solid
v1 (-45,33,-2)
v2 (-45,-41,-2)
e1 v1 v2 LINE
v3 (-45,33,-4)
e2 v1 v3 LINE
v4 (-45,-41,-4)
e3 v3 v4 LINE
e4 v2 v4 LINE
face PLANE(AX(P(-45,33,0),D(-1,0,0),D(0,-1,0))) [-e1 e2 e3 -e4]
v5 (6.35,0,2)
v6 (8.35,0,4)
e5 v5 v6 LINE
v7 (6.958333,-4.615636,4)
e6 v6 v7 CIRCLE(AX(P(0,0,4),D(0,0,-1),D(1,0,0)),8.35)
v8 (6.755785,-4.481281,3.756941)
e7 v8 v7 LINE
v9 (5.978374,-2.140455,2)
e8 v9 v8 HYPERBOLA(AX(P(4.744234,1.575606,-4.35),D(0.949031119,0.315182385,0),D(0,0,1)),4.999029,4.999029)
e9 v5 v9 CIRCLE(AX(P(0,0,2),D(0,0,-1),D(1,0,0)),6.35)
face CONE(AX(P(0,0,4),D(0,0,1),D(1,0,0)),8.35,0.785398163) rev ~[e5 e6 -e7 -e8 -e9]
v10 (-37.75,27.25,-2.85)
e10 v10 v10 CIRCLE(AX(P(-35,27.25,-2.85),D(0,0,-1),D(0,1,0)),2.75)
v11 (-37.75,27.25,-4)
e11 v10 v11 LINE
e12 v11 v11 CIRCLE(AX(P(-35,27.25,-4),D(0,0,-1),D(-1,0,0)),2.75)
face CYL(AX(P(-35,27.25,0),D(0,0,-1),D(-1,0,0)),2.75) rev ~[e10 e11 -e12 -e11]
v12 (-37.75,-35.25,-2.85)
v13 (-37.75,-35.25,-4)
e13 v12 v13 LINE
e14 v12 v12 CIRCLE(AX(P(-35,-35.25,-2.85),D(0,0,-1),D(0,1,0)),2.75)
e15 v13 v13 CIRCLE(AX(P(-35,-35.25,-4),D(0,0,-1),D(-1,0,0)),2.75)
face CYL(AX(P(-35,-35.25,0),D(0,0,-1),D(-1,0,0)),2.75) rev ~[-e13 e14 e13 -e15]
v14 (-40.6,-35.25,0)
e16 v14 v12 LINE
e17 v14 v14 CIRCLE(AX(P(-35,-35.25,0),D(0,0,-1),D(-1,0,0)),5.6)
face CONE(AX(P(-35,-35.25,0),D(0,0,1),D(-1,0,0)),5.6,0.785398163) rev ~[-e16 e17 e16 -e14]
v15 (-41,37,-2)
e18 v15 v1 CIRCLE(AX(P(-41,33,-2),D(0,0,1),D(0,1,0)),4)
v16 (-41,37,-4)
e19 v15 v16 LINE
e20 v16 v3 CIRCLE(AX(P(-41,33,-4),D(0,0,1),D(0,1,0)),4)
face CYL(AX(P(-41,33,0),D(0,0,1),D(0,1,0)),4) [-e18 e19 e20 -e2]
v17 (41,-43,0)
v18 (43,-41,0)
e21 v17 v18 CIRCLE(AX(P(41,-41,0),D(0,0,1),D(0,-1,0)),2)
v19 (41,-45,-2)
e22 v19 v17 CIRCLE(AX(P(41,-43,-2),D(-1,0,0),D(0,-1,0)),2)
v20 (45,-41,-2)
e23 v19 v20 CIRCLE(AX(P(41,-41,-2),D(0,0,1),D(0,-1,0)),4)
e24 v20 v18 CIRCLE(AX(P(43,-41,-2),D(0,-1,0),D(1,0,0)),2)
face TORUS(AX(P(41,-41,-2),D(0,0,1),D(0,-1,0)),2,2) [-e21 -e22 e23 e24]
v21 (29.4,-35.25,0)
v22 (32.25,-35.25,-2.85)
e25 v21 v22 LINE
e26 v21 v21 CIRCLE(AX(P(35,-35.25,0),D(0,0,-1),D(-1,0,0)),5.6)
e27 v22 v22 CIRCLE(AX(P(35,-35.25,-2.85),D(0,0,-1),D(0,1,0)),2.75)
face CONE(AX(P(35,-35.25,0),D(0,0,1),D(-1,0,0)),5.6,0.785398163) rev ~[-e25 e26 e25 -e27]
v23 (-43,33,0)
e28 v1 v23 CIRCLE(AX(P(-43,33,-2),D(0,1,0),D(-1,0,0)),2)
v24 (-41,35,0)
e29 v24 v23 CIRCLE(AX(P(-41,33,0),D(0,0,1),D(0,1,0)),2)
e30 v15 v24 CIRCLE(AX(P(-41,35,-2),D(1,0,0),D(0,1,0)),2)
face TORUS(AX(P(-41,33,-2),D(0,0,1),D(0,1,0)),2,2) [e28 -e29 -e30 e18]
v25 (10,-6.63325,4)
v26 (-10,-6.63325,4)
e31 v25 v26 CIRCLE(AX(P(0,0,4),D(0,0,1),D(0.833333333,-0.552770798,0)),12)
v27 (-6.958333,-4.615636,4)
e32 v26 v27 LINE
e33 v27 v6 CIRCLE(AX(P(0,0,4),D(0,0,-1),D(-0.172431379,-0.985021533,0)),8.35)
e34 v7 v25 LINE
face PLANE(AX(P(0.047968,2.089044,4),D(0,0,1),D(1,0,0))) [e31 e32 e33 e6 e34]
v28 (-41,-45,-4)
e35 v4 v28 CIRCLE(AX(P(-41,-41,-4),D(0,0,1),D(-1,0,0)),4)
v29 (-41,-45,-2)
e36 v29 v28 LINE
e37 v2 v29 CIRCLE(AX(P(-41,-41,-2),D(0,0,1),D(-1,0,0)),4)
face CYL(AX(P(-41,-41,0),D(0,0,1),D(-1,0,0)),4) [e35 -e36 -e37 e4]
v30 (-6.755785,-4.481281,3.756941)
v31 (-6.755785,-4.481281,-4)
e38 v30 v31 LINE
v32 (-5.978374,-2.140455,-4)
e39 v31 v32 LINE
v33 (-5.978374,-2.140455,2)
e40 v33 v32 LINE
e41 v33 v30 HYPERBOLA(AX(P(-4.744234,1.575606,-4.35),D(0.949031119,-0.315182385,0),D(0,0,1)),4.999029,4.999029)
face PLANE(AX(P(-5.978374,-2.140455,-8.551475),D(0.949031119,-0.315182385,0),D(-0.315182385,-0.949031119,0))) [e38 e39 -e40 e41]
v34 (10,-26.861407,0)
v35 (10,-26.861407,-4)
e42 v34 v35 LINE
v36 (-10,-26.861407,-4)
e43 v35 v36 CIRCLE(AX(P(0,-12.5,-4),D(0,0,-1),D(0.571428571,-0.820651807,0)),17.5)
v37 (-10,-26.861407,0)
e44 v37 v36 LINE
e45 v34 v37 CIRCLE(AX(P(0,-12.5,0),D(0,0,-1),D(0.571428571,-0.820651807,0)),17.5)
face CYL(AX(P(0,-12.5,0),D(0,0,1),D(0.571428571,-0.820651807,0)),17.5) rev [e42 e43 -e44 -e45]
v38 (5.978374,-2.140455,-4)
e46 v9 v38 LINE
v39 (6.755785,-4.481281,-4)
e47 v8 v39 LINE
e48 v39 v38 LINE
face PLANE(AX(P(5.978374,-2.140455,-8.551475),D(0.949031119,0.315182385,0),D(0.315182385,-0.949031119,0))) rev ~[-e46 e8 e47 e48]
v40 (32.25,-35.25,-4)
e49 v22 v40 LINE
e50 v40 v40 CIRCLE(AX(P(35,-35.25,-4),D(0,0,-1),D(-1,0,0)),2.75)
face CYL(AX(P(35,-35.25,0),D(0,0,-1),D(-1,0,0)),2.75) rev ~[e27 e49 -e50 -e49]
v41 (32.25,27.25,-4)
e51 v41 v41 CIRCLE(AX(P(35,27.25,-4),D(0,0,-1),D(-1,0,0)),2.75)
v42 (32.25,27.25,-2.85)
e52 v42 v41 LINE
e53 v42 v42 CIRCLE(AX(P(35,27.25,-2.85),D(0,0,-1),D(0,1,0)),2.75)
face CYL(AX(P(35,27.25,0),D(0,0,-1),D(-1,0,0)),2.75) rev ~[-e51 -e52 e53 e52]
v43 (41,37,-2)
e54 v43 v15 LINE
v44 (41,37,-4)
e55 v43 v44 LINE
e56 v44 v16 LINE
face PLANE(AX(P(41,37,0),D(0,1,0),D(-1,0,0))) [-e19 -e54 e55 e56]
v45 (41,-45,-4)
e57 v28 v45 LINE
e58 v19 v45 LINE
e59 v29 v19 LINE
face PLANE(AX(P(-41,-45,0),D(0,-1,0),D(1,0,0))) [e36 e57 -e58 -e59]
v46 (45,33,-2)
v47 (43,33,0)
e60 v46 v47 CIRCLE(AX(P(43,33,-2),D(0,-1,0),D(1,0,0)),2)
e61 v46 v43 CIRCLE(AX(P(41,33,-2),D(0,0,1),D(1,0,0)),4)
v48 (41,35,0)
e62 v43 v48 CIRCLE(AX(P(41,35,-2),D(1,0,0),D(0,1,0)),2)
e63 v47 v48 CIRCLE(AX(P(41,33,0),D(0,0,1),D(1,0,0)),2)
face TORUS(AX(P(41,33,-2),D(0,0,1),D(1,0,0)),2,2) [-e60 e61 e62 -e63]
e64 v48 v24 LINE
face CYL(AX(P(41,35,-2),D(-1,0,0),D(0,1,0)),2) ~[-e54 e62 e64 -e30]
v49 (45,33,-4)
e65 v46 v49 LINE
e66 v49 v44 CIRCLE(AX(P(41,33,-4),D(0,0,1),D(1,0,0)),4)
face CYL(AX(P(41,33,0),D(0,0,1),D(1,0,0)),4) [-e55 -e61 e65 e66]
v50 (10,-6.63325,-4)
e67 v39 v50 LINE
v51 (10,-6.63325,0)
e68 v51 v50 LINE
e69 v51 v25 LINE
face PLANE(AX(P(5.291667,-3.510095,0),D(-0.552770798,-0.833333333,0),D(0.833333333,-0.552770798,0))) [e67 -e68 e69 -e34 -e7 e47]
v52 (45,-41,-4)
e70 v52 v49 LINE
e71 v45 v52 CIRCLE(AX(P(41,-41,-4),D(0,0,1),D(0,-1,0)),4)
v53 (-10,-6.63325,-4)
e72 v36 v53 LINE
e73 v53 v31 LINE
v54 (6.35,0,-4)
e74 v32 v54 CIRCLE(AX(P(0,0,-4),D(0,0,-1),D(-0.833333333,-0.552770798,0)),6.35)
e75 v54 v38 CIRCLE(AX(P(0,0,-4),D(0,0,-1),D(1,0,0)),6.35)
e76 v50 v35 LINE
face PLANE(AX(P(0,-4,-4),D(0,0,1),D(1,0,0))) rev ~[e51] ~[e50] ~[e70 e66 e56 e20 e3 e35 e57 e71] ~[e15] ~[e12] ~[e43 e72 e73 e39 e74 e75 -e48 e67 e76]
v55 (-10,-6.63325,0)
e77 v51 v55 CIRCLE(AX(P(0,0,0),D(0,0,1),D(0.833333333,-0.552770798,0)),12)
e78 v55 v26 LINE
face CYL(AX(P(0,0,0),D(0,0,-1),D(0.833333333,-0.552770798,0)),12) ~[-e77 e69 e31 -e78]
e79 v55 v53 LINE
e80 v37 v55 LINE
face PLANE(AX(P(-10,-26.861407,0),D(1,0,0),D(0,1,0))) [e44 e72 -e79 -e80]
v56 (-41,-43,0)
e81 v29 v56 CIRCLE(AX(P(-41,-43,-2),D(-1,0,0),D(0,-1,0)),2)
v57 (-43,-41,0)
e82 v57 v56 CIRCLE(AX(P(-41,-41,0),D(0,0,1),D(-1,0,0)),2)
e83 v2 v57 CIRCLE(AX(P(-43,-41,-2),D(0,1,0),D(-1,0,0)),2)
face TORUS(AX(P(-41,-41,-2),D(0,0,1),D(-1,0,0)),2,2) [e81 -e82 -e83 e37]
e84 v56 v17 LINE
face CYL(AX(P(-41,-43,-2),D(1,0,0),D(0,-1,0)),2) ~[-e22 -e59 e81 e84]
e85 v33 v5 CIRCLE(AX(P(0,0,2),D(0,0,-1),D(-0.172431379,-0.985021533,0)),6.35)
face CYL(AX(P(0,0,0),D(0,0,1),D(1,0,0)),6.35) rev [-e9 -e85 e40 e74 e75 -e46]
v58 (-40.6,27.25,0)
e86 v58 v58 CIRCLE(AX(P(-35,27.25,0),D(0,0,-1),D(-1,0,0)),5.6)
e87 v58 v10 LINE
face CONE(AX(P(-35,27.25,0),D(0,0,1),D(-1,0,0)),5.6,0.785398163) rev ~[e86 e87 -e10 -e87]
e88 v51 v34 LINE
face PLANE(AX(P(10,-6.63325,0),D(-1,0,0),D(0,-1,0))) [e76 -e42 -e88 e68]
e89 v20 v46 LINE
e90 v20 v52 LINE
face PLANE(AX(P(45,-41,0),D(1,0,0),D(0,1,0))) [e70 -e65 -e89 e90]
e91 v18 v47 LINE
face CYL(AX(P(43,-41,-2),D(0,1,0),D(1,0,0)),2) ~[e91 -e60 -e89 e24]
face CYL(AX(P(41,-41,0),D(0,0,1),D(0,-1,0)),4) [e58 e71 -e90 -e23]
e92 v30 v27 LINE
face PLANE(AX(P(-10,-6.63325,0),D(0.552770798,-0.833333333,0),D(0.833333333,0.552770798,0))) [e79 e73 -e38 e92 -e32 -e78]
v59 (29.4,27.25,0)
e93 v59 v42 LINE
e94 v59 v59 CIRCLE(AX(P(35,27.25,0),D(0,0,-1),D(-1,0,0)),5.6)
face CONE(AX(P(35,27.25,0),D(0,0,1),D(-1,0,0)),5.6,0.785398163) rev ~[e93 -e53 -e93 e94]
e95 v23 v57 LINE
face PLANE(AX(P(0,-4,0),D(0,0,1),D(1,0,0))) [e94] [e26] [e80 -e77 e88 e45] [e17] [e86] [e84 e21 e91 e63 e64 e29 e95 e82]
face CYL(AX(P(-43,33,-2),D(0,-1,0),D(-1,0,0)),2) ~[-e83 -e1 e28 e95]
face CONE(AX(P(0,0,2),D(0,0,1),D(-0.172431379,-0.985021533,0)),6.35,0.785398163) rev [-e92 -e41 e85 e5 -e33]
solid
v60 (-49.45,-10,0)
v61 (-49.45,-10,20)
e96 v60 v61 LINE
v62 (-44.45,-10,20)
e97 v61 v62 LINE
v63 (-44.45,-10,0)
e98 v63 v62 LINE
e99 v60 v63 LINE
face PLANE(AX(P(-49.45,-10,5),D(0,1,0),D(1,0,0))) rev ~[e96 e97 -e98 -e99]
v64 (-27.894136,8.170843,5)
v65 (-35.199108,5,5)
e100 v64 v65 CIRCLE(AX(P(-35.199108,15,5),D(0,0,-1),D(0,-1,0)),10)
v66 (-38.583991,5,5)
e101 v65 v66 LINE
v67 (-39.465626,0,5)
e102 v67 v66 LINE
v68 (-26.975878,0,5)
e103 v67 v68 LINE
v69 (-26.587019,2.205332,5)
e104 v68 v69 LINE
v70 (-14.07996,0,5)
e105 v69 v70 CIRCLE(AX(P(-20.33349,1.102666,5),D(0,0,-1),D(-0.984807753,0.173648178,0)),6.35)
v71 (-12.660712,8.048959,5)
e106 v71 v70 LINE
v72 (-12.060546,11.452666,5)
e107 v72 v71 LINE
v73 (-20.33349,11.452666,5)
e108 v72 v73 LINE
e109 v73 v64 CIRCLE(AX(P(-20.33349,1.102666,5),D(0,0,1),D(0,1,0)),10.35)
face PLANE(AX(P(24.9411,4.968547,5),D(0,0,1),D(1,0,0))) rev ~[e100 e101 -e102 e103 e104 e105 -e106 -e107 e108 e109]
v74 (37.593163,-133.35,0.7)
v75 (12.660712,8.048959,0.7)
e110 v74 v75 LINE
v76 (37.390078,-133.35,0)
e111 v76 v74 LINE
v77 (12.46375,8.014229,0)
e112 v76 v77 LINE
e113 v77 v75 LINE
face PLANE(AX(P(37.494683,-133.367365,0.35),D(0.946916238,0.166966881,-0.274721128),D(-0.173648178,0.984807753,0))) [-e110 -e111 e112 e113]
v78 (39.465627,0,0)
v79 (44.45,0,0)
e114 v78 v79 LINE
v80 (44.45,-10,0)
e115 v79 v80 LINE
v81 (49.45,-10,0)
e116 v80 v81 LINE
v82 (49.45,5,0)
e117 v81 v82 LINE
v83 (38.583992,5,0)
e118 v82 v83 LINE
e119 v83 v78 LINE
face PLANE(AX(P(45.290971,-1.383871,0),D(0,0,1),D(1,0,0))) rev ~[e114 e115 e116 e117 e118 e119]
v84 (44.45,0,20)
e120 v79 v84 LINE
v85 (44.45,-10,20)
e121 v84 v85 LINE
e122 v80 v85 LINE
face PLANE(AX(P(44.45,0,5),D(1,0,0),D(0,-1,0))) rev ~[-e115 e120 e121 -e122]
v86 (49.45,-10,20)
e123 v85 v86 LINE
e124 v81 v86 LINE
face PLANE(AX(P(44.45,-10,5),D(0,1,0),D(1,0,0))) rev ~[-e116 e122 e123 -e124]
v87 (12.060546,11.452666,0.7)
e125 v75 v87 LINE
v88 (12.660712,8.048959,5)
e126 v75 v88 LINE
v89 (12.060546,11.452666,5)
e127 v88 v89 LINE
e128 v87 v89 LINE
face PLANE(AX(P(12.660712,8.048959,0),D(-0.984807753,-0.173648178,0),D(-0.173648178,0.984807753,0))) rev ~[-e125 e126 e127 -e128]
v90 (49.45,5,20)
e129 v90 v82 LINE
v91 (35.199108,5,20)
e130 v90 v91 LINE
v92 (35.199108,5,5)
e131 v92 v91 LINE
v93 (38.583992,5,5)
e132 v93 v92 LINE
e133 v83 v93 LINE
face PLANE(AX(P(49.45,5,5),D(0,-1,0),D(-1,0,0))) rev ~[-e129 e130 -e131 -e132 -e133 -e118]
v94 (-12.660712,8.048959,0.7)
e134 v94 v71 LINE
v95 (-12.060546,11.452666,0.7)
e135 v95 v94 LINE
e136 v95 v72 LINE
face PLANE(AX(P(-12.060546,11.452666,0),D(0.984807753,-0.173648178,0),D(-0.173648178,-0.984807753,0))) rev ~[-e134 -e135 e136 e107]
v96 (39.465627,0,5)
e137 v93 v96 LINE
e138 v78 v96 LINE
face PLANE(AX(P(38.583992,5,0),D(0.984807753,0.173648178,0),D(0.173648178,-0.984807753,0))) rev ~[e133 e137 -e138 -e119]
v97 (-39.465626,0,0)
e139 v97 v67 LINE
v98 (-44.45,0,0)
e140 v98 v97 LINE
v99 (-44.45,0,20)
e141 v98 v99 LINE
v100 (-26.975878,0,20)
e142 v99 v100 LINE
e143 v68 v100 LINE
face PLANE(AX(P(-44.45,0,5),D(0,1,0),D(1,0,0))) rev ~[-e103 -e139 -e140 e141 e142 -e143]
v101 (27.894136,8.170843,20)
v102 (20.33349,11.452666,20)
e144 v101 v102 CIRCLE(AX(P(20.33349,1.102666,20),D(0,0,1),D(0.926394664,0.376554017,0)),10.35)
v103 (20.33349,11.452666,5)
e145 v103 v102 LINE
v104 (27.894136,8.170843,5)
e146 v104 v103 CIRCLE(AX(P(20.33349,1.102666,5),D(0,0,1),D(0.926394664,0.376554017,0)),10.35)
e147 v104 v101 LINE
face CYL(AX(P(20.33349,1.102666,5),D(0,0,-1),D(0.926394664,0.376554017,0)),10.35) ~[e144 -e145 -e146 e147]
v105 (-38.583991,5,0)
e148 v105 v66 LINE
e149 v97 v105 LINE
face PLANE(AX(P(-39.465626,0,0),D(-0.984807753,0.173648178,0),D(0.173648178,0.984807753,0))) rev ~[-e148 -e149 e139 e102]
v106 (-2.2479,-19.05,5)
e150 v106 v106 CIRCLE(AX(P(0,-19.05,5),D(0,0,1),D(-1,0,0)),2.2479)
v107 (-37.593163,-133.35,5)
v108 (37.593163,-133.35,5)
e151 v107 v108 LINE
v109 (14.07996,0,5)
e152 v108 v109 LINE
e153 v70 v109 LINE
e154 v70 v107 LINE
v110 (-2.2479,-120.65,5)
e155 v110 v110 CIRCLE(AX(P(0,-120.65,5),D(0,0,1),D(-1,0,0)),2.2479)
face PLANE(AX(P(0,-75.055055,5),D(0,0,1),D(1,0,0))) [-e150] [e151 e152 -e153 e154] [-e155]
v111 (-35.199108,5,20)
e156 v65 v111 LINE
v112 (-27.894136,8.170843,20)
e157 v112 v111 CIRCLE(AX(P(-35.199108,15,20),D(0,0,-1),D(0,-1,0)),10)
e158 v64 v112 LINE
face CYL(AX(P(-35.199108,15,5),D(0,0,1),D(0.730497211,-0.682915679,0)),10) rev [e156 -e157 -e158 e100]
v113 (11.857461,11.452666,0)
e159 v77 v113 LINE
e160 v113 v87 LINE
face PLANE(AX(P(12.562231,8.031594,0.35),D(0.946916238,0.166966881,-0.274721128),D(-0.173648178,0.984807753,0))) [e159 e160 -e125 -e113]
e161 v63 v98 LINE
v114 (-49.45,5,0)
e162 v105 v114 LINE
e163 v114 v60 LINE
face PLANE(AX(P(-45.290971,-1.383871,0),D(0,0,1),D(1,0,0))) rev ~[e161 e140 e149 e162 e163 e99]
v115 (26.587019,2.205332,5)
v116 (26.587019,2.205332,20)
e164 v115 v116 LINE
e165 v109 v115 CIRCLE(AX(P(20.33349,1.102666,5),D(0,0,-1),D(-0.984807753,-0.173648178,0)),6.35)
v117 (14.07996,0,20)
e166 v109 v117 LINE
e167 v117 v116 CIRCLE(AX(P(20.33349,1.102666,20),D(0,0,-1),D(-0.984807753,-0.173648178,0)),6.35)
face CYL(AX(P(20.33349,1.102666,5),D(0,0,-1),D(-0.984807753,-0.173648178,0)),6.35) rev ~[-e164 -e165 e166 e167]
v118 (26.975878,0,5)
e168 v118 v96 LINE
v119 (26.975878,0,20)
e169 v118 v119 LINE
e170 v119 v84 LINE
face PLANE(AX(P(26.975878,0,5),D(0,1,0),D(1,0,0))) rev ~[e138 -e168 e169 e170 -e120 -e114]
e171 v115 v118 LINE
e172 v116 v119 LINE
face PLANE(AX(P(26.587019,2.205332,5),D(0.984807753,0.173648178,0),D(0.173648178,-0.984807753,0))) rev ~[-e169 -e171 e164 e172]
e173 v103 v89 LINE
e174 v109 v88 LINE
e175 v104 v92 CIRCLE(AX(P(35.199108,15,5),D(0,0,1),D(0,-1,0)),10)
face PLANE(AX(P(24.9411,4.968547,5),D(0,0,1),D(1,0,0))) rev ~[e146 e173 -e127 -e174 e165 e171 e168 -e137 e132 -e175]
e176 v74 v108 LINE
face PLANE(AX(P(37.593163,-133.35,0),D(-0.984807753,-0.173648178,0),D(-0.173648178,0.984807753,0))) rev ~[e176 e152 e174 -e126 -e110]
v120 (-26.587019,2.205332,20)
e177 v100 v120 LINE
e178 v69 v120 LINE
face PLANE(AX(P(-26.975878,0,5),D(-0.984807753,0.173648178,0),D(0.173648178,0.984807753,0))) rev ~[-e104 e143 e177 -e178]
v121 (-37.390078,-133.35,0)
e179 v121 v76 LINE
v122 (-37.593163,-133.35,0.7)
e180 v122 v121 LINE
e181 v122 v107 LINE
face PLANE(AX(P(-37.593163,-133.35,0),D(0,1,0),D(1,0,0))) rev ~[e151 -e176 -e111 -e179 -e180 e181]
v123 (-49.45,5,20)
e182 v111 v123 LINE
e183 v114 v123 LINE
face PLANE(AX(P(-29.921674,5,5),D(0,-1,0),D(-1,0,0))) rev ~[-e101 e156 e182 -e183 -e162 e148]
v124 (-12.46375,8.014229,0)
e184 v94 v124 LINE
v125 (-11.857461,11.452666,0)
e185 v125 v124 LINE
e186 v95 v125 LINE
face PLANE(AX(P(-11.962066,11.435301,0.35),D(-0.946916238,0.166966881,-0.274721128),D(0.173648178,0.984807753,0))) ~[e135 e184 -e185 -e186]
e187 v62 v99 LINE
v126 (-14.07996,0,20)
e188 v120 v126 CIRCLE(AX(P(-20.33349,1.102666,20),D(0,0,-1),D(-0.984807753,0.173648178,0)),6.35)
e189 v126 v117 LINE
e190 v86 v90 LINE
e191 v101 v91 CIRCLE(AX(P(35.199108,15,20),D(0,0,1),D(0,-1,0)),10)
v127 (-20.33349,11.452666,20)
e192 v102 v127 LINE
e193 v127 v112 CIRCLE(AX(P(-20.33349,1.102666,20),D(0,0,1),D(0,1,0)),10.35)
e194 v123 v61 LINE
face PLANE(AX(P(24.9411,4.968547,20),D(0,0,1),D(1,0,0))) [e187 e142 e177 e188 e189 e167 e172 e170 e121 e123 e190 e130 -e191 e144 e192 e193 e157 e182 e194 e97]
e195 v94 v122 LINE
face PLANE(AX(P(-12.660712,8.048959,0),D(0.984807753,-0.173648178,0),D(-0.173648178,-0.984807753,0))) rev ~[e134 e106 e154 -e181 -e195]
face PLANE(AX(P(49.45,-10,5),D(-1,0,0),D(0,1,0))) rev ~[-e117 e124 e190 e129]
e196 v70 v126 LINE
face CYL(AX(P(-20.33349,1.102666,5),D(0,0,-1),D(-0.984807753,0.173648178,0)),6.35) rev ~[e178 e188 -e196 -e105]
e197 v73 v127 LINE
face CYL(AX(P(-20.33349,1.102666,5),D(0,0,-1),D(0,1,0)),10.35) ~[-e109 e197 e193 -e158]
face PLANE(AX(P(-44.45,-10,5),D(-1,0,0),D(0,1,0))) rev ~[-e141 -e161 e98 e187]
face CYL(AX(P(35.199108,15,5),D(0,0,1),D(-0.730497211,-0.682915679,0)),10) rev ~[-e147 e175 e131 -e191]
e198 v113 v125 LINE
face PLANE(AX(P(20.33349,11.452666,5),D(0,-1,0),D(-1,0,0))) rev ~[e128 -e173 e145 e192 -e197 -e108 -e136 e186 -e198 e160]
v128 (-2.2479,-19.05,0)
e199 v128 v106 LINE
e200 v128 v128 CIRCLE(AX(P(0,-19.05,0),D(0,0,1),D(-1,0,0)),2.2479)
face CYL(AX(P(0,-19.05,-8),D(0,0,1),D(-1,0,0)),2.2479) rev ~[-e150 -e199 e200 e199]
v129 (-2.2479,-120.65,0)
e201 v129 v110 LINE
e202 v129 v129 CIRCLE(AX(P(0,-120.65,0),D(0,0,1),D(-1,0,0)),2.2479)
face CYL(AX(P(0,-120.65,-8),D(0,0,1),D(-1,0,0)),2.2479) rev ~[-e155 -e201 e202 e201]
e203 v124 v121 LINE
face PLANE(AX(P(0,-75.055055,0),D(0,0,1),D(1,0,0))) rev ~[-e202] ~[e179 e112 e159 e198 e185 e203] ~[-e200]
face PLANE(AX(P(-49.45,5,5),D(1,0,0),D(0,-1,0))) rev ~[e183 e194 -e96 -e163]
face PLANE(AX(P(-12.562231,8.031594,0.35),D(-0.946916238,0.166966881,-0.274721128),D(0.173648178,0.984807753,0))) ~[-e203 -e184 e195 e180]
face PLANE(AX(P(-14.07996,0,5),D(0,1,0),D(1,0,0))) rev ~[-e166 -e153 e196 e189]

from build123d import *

# Parameters (mm, degrees)
F1_DEPTH       = 4
F2_DEPTH       = 4
F3_T1_DEPTH    = 17.102949117
F3_T3_DEPTH    = 8.5514745585
F3_T5_DEPTH    = 8.5514745585
F3_T8_ANGLE    = 260.0707852325
F3_T10_ANGLE   = 79.9682730154
F4_D           = 5.5
F4_DEPTH       = 8
F4_CSINK_D     = 11.2
F4_CSINK_ANGLE = 90
F4_TIP         = 1.6523667023
F5_R           = 2
F7_DEPTH       = 5
F8_START       = 5
F8_DEPTH       = 15
F9_DEPTH       = 5
F10_D          = 4.4958
F10_DEPTH      = 8
F10_TIP        = 1.3506745855
F11_C1_SIZE2   = 0.2
F11_C1_SIZE    = 0.7
F11_C2_SIZE2   = 0.7
F11_C2_SIZE    = 0.2
F12_R          = 10


# Not quite as in the source:
# - a fillet or chamfer that OpenCascade refuses, or shapes differently, is made with other operations: its cross-section is extruded or revolved along the edge and cut away or added
# - a feature names something its author has since deleted; it is built from what else it names


with BuildPart() as f1:
    # F0 (on Top) → F1 (new body)
    with BuildSketch(Plane.XY):
        with BuildLine():
            Line((-41, -45), (41, -45))
            ThreePointArc((41, -45), (43.8284271247, -43.8284271247), (45, -41))
            Line((45, -41), (45, 33))
            ThreePointArc((45, 33), (43.8284271247, 35.8284271247), (41, 37))
            Line((41, 37), (-41, 37))
            ThreePointArc((-41, 37), (-43.8284271247, 35.8284271247), (-45, 33))
            Line((-45, 33), (-45, -41))
            ThreePointArc((-45, -41), (-43.8284271247, -43.8284271247), (-41, -45))
        make_face()
        with BuildLine():
            Line((-10, -26.8614066163), (-10, -6.6332495807))
            ThreePointArc((-10, -6.6332495807), (0, 12), (10, -6.6332495807))
            Line((10, -6.6332495807), (10, -26.8614066163))
            ThreePointArc((10, -26.8614066163), (0, -30), (-10, -26.8614066163))
        make_face(mode=Mode.SUBTRACT)
        with BuildLine():
            ThreePointArc((-5.2916666667, -3.5100945698), (-1.8330871047, 6.0796621343), (6.35, 0))
            ThreePointArc((6.35, 0), (6.0796621343, -1.8330871047), (5.2916666667, -3.5100945698))
            Line((5.2916666667, -3.5100945698), (10, -6.6332495807))
            ThreePointArc((10, -6.6332495807), (0, 12), (-10, -6.6332495807))
            Line((-10, -6.6332495807), (-5.2916666667, -3.5100945698))
        make_face()
    extrude(amount=-F1_DEPTH)

    # F0 (on Top) → F2 (join)
    with BuildSketch(Plane.XY):
        with BuildLine():
            ThreePointArc((-5.2916666667, -3.5100945698), (-1.8330871047, 6.0796621343), (6.35, 0))
            ThreePointArc((6.35, 0), (6.0796621343, -1.8330871047), (5.2916666667, -3.5100945698))
            Line((5.2916666667, -3.5100945698), (10, -6.6332495807))
            ThreePointArc((10, -6.6332495807), (0, 12), (-10, -6.6332495807))
            Line((-10, -6.6332495807), (-5.2916666667, -3.5100945698))
        make_face()
    extrude(amount=F2_DEPTH)

    # F3: chamfer of 2 on 5 edges, made by hand

    # F3_s2 → F3_t1 (cut)
    with BuildSketch(Plane.XY.offset(-8.5514745585)):
        with BuildLine():
            Line((-5.9783737827, -2.1404548382), (-6.7557845584, -4.481280509))
            Line((-6.7557845584, -4.481280509), (-5.2916666667, -3.5100945698))
            ThreePointArc((-5.2916666667, -3.5100945698), (-5.6892505447, -2.8204482338), (-5.9783737827, -2.1404548382))
        make_face()
    extrude(amount=F3_T1_DEPTH, mode=Mode.SUBTRACT)

    # F3_s4 → F3_t3 (cut)
    with BuildSketch(Plane.XY.offset(-8.5514745585)):
        with BuildLine():
            Line((5.9783737827, -2.1404548382), (6.7557845584, -4.481280509))
            Line((6.7557845584, -4.481280509), (5.2916666667, -3.5100945698))
            ThreePointArc((5.2916666667, -3.5100945698), (5.6892505447, -2.8204482338), (5.9783737827, -2.1404548382))
        make_face()
    extrude(amount=F3_T3_DEPTH, mode=Mode.SUBTRACT)

    # F3_s6 → F3_t5 (cut)
    with BuildSketch(Plane.XY):
        with BuildLine():
            Line((5.9783737827, -2.1404548382), (6.7557845584, -4.481280509))
            Line((6.7557845584, -4.481280509), (5.2916666667, -3.5100945698))
            ThreePointArc((5.2916666667, -3.5100945698), (5.6892505447, -2.8204482338), (5.9783737827, -2.1404548382))
        make_face()
    extrude(amount=F3_T5_DEPTH, mode=Mode.SUBTRACT)

    # F3_s7 → F3_t8 (revolve, cut)
    with BuildSketch(Plane(origin=(0, 0, 0), x_dir=(0, 0, 1), z_dir=(0.9850215325, -0.1724313791, 0))):
        Polygon((2, 6.35), (4, 8.35), (4, 6.35), align=None)
    revolve(axis=Axis((0, 0, 4), (0, 0, -1)), revolution_arc=F3_T8_ANGLE, mode=Mode.SUBTRACT)

    # F3_s9 → F3_t10 (revolve, cut)
    with BuildSketch(Plane.XZ):
        Polygon((8.35, 4), (6.35, 2), (6.35, 4), align=None)
    revolve(axis=Axis((0, 0, 4), (0, 0, -1)), revolution_arc=F3_T10_ANGLE, mode=Mode.SUBTRACT)

    # F4
    with Locations(Plane.XY):
        with Locations((-35, 27.25), (-35, -35.25), (35, -35.25), (35, 27.25)):
            CounterSinkHole(F4_D / 2, F4_CSINK_D / 2, depth=F4_DEPTH, counter_sink_angle=F4_CSINK_ANGLE)
            with Locations((0, 0, -(F4_DEPTH + F4_TIP / 2))):  # 118° drill point
                Cone(0, F4_D / 2, F4_TIP, mode=Mode.SUBTRACT)

    # F5
    f5_edges = [f1.edges().sort_by_distance(p)[0] for p in [
        (0, -45, 0),
        (-43.828427, -43.828427, 0),
        (43.828427, -43.828427, 0),
        (-43.828427, 35.828427, 0),
        (43.828427, 35.828427, 0),
        (0, 37, 0),
    ]]
    fillet(f5_edges, radius=F5_R)

    # F6 (on Top) → F9 (cut)
    with BuildSketch(Plane.XY):
        with BuildLine():
            Line((12.6607118812, 8.0489585372), (14.0799604379, 0))
            ThreePointArc((14.0799604379, 0), (19.2308237413, 7.3561951598), (26.5870189011, 2.2053318564))
            Line((26.5870189011, 2.2053318564), (26.9758784088, 0))
            Line((26.9758784088, 0), (39.4656266949, 0))
            Line((39.4656266949, 0), (38.5839917914, 5))
            Line((38.5839917914, 5), (29.9216744368, 5))
            ThreePointArc((29.9216744368, 5), (26.1121180689, 9.6892807339), (20.3334896695, 11.4526659282))
            ThreePointArc((20.3334896695, 11.4526659282), (16.1365639198, 10.5635493041), (12.6607118812, 8.0489585372))
        make_face()
        with BuildLine():
            ThreePointArc((-26.5870189011, 2.2053318564), (-19.2308237413, 7.3561951598), (-14.0799604379, 0))
            Line((-14.0799604379, 0), (-12.6607118812, 8.0489585372))
            ThreePointArc((-12.6607118812, 8.0489585372), (-16.1365639198, 10.5635493041), (-20.3334896695, 11.4526659282))
            ThreePointArc((-20.3334896695, 11.4526659282), (-26.1121180689, 9.6892807339), (-29.9216744368, 5))
            Line((-29.9216744368, 5), (-38.5839908315, 5))
            Line((-38.5839908315, 5), (-39.465625735, 0))
            Line((-39.465625735, 0), (-26.9758784088, 0))
            Line((-26.9758784088, 0), (-26.5870189011, 2.2053318564))
        make_face()
    extrude(amount=F9_DEPTH, mode=Mode.SUBTRACT)


with BuildPart() as f7:
    # F6 (on Top) → F7 (new body)
    with BuildSketch(Plane.XY):
        Polygon((-14.0799604379, 0), (-37.5931633153, -133.35), (37.5931633153, -133.35), (14.0799604379, 0), align=None)
        with BuildLine():
            Line((-12.6607118812, 8.0489585372), (-14.0799604379, 0))
            Line((-14.0799604379, 0), (14.0799604379, 0))
            Line((14.0799604379, 0), (12.6607118812, 8.0489585372))
            ThreePointArc((12.6607118812, 8.0489585372), (11.5694013468, 6.6084134589), (10.7453049022, 5))
            Line((10.7453049022, 5), (-10.7453049022, 5))
            ThreePointArc((-10.7453049022, 5), (-11.5694013468, 6.6084134589), (-12.6607118812, 8.0489585372))
        make_face()
        with BuildLine():
            Line((-12.0605464337, 11.4526659282), (-12.6607118812, 8.0489585372))
            ThreePointArc((-12.6607118812, 8.0489585372), (-11.5694013468, 6.6084134589), (-10.7453049022, 5))
            Line((-10.7453049022, 5), (10.7453049022, 5))
            ThreePointArc((10.7453049022, 5), (11.5694013468, 6.6084134589), (12.6607118812, 8.0489585372))
            Line((12.6607118812, 8.0489585372), (12.0605464337, 11.4526659282))
            Line((12.0605464337, 11.4526659282), (-12.0605464337, 11.4526659282))
        make_face()
    extrude(amount=F7_DEPTH)



with BuildPart() as f7b:
    # F6 (on Top) → F7, piece 2 (new body)
    with BuildSketch(Plane.XY):
        Polygon((38.5839917914, 5), (39.4656266949, 0), (44.45, 0), (44.45, -10), (49.45, -10), (49.45, 5), align=None)
    extrude(amount=F7_DEPTH)


with BuildPart() as f7c:
    # F6 (on Top) → F7, piece 3 (new body)
    with BuildSketch(Plane.XY):
        Polygon((-44.45, 0), (-39.465625735, 0), (-38.5839908315, 5), (-49.45, 5), (-49.45, -10), (-44.45, -10), align=None)
    extrude(amount=F7_DEPTH)


with BuildPart() as f7_1:
    add(f7.part)

    add(f7b.part)  # F8 merges F7b

    add(f7c.part)  # F8 merges F7c
    # F6 (on Top) → F8 (join)
    with BuildSketch(Plane.XY.offset(F8_START)):
        with BuildLine():
            Line((12.6607118812, 8.0489585372), (14.0799604379, 0))
            ThreePointArc((14.0799604379, 0), (19.2308237413, 7.3561951598), (26.5870189011, 2.2053318564))
            Line((26.5870189011, 2.2053318564), (26.9758784088, 0))
            Line((26.9758784088, 0), (39.4656266949, 0))
            Line((39.4656266949, 0), (38.5839917914, 5))
            Line((38.5839917914, 5), (29.9216744368, 5))
            ThreePointArc((29.9216744368, 5), (26.1121180689, 9.6892807339), (20.3334896695, 11.4526659282))
            ThreePointArc((20.3334896695, 11.4526659282), (16.1365639198, 10.5635493041), (12.6607118812, 8.0489585372))
        make_face()
        Polygon((38.5839917914, 5), (39.4656266949, 0), (44.45, 0), (44.45, -10), (49.45, -10), (49.45, 5), align=None)
        with BuildLine():
            ThreePointArc((-26.5870189011, 2.2053318564), (-19.2308237413, 7.3561951598), (-14.0799604379, 0))
            Line((-14.0799604379, 0), (-12.6607118812, 8.0489585372))
            ThreePointArc((-12.6607118812, 8.0489585372), (-16.1365639198, 10.5635493041), (-20.3334896695, 11.4526659282))
            ThreePointArc((-20.3334896695, 11.4526659282), (-26.1121180689, 9.6892807339), (-29.9216744368, 5))
            Line((-29.9216744368, 5), (-38.5839908315, 5))
            Line((-38.5839908315, 5), (-39.465625735, 0))
            Line((-39.465625735, 0), (-26.9758784088, 0))
            Line((-26.9758784088, 0), (-26.5870189011, 2.2053318564))
        make_face()
        Polygon((-44.45, 0), (-39.465625735, 0), (-38.5839908315, 5), (-49.45, 5), (-49.45, -10), (-44.45, -10), align=None)
        with BuildLine():
            Line((-12.6607118812, 8.0489585372), (-14.0799604379, 0))
            Line((-14.0799604379, 0), (14.0799604379, 0))
            Line((14.0799604379, 0), (12.6607118812, 8.0489585372))
            ThreePointArc((12.6607118812, 8.0489585372), (11.5694013468, 6.6084134589), (10.7453049022, 5))
            Line((10.7453049022, 5), (-10.7453049022, 5))
            ThreePointArc((-10.7453049022, 5), (-11.5694013468, 6.6084134589), (-12.6607118812, 8.0489585372))
        make_face()
        with BuildLine():
            Line((-12.0605464337, 11.4526659282), (-12.6607118812, 8.0489585372))
            ThreePointArc((-12.6607118812, 8.0489585372), (-11.5694013468, 6.6084134589), (-10.7453049022, 5))
            Line((-10.7453049022, 5), (10.7453049022, 5))
            ThreePointArc((10.7453049022, 5), (11.5694013468, 6.6084134589), (12.6607118812, 8.0489585372))
            Line((12.6607118812, 8.0489585372), (12.0605464337, 11.4526659282))
            Line((12.0605464337, 11.4526659282), (-12.0605464337, 11.4526659282))
        make_face()
        with BuildLine():
            Line((12.0605464337, 11.4526659282), (12.6607118812, 8.0489585372))
            ThreePointArc((12.6607118812, 8.0489585372), (16.1365639198, 10.5635493041), (20.3334896695, 11.4526659282))
            Line((20.3334896695, 11.4526659282), (12.0605464337, 11.4526659282))
        make_face()
        with BuildLine():
            ThreePointArc((-20.3334896695, 11.4526659282), (-16.1365639198, 10.5635493041), (-12.6607118812, 8.0489585372))
            Line((-12.6607118812, 8.0489585372), (-12.0605464337, 11.4526659282))
            Line((-12.0605464337, 11.4526659282), (-20.3334896695, 11.4526659282))
        make_face()
    extrude(amount=F8_DEPTH)

    # F10
    with Locations(Plane(origin=(0, 0, 0), x_dir=(1, 0, 0), z_dir=(0, 0, -1))):
        with Locations((0, 19.05), (0, 120.65)):
            Hole(F10_D / 2, depth=F10_DEPTH)
            with Locations((0, 0, -(F10_DEPTH + F10_TIP / 2))):  # 118° drill point
                Cone(0, F10_D / 2, F10_TIP, mode=Mode.SUBTRACT)

    # F11: chamfer of 0.2 x 0.7 on 2 edges, made by hand

    # F11_c1
    f11_c1_edges = [f7_1.edges().sort_by_distance(p)[0] for p in [
        (-24.8268548745, -60.9486670359, 0),
    ]]
    f11_c1_side = f7_1.faces().sort_by_distance((-24.8268548745, -60.9486670359, 0.004))[0]
    chamfer(f11_c1_edges, length=F11_C1_SIZE, length2=F11_C1_SIZE2, reference=f11_c1_side)

    # F11_c2
    f11_c2_edges = [f7_1.edges().sort_by_distance(p)[0] for p in [
        (24.8268548745, -60.9486670359, 0),
    ]]
    f11_c2_side = f7_1.faces().sort_by_distance((24.8229156435, -60.9493616286, 0))[0]
    chamfer(f11_c2_edges, length=F11_C2_SIZE, length2=F11_C2_SIZE2, reference=f11_c2_side)

    # F12
    f12_edges = [f7_1.edges().sort_by_distance(p)[0] for p in [
        (29.921674, 5, 12.5),
        (-29.921674, 5, 12.5),
    ]]
    fillet(f12_edges, radius=F12_R)


solid = Compound([f1.part, f7_1.part])
